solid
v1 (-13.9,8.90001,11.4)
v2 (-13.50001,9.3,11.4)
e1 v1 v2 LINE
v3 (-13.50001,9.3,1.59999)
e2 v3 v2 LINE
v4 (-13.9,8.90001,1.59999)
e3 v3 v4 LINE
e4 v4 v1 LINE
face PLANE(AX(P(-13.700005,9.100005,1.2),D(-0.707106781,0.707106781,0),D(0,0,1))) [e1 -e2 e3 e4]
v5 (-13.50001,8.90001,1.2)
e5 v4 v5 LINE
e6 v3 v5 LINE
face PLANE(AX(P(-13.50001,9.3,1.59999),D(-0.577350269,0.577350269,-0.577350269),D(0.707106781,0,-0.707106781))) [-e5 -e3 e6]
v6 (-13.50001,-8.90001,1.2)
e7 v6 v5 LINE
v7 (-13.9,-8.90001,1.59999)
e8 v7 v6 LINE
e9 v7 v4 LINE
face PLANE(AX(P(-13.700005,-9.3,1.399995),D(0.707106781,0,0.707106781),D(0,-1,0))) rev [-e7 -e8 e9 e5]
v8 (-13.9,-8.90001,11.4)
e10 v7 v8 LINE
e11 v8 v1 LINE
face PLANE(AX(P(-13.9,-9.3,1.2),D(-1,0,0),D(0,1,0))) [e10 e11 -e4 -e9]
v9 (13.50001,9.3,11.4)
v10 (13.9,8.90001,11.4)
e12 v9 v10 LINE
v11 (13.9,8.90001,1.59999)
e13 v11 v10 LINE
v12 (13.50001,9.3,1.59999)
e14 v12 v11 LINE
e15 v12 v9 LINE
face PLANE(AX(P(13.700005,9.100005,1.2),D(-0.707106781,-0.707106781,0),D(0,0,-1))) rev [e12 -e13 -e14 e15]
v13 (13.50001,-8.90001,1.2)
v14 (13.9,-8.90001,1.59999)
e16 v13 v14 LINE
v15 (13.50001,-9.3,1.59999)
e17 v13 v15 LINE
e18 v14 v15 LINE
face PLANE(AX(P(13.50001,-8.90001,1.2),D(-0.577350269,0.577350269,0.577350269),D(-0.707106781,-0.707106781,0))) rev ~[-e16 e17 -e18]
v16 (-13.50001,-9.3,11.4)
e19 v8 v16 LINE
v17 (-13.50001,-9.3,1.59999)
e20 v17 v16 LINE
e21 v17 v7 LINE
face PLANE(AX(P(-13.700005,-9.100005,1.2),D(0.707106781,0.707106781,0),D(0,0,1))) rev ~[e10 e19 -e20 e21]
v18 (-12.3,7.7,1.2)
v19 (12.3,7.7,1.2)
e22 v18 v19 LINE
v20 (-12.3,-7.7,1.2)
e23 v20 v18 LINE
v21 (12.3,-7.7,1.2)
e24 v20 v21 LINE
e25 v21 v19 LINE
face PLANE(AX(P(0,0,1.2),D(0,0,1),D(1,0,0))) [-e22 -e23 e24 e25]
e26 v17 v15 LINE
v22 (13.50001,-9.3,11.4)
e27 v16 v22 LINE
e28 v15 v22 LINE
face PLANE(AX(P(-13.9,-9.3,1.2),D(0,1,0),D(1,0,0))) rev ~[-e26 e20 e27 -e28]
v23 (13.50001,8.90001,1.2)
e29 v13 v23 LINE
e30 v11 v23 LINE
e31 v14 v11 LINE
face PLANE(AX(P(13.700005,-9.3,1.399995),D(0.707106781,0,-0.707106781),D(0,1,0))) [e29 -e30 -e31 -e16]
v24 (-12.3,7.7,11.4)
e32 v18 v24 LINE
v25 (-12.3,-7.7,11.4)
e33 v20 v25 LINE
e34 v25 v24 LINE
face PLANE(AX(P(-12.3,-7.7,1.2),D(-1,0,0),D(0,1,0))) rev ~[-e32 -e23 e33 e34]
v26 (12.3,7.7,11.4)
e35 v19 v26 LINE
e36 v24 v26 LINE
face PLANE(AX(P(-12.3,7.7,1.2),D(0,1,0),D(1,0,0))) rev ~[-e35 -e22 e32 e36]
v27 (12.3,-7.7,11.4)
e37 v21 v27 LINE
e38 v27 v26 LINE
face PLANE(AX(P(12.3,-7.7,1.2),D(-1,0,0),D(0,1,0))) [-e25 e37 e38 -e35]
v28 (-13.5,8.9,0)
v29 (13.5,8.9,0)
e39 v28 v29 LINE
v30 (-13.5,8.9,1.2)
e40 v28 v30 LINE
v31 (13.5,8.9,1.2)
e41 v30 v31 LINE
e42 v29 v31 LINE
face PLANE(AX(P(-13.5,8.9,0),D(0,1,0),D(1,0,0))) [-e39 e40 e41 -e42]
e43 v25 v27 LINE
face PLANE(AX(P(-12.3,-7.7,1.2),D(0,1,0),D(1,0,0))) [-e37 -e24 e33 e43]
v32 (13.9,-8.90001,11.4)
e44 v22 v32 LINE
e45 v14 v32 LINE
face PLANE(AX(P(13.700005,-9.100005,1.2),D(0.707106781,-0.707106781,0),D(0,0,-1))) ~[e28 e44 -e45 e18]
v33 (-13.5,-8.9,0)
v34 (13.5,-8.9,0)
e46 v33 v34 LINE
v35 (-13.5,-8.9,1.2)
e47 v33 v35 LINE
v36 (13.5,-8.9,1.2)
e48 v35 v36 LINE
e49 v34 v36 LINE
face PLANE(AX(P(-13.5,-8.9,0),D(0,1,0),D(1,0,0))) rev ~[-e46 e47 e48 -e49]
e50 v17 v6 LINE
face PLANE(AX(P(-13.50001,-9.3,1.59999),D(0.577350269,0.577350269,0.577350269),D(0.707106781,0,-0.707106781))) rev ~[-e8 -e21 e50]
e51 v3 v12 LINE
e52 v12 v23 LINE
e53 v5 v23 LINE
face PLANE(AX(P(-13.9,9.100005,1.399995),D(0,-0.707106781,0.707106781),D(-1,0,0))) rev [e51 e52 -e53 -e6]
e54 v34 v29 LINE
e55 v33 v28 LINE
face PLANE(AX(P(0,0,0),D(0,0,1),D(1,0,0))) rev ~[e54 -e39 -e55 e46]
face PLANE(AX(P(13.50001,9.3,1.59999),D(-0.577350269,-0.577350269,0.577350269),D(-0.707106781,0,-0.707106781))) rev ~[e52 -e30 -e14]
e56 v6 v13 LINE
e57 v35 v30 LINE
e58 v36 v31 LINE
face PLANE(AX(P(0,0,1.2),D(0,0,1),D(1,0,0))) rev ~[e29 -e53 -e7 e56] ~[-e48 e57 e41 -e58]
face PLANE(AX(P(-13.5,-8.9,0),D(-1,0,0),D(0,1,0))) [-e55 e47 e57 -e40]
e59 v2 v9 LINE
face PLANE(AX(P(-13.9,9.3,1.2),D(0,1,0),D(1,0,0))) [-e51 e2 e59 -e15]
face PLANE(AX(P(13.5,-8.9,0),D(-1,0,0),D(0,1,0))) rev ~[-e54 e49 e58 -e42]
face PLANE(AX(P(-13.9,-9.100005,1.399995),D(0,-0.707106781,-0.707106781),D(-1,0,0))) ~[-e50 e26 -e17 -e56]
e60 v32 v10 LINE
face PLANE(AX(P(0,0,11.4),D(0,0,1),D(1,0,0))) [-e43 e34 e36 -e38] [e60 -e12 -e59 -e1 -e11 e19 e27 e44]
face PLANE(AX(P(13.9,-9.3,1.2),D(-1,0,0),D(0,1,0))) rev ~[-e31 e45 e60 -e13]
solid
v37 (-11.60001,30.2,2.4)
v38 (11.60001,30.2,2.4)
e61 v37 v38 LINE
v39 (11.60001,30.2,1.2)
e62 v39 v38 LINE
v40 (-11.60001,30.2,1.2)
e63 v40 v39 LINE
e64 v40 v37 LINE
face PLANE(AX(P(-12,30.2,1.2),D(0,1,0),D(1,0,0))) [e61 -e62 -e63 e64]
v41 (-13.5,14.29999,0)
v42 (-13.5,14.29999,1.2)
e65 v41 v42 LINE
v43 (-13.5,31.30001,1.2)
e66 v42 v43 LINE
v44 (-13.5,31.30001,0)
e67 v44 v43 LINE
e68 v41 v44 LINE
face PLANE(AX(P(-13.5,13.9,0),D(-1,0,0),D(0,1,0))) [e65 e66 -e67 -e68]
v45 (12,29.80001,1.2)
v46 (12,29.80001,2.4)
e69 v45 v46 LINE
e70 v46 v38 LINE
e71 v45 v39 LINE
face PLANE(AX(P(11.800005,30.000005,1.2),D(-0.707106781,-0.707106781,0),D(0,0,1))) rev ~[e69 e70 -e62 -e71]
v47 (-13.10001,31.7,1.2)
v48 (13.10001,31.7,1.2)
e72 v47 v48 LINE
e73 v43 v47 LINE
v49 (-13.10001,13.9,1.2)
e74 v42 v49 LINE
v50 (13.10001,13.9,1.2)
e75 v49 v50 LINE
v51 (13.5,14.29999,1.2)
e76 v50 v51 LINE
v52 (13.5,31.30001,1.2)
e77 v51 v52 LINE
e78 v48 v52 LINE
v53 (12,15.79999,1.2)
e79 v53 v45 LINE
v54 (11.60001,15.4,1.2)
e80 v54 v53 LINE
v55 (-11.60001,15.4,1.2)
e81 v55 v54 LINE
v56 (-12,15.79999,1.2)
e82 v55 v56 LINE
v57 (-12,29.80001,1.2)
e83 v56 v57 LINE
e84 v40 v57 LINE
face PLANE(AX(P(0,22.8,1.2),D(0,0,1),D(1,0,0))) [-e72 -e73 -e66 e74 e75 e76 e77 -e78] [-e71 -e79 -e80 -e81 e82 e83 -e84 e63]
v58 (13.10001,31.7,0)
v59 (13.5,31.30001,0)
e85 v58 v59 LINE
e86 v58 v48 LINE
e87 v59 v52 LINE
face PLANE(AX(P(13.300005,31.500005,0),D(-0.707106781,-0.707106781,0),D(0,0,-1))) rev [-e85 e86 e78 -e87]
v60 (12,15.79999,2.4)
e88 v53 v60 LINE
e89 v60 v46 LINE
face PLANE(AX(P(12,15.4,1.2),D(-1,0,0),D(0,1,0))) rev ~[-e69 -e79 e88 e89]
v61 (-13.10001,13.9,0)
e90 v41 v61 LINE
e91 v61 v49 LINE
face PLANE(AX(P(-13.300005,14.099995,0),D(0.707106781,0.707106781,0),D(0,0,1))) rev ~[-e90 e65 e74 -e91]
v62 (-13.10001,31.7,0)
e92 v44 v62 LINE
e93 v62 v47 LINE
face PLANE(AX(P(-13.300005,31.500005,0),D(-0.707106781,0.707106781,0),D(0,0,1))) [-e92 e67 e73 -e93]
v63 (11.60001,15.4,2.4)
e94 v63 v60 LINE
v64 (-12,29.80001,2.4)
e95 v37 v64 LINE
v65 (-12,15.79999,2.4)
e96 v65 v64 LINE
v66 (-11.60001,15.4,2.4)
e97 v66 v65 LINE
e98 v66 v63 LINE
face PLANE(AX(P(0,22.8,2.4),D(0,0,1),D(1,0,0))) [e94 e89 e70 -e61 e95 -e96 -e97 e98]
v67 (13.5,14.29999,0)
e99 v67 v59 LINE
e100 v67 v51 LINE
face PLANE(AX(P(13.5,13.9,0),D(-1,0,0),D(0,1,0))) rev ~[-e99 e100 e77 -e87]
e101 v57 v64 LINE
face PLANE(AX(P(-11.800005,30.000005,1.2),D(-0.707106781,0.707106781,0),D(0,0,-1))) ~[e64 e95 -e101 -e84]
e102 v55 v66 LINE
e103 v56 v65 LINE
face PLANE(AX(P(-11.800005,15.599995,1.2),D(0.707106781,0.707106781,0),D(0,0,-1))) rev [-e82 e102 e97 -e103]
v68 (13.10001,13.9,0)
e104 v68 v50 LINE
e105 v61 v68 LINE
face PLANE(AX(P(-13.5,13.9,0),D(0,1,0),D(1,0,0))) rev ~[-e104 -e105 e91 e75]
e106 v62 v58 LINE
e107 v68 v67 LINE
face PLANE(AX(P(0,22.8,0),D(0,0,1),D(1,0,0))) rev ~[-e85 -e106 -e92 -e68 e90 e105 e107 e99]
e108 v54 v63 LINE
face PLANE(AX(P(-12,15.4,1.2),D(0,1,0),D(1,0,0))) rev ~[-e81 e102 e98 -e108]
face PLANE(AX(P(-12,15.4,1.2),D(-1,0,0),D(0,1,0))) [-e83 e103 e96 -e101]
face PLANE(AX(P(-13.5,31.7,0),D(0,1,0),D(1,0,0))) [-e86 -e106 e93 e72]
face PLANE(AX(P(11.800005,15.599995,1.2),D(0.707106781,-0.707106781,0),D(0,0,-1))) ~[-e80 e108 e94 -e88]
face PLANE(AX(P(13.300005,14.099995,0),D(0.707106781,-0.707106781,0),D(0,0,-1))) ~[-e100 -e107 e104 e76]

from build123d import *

# Parameters (mm, degrees)
F0_W      = 27
F0_H      = 17.8
F1_DEPTH  = 1.2
F2_W      = 27.8
F2_H      = 18.6
F2_W_2    = 27
F2_H_2    = 17.8
F2_W_3    = 24.6
F2_H_3    = 15.4
F3_DEPTH  = 10.2
F4_W      = 24
F4_H      = 14.8
F5_DEPTH  = 1.2
F6_SIZE   = 0.39999
F6_2_SIZE = 0.39999


# Not quite as in the source:
# - a fillet or chamfer is up to 0.001 mm smaller than in the source, because OpenCascade refuses the exact size


with BuildPart() as f1:
    # F0 (on Top) → F1 (new body)
    with BuildSketch(Plane.XY):
        Rectangle(F0_W, F0_H)
    extrude(amount=F1_DEPTH)

    # F2 (on face) → F3 (join)
    with BuildSketch(Plane.XY.offset(1.2)):
        Rectangle(F2_W, F2_H)
        Rectangle(F2_W_2, F2_H_2, mode=Mode.SUBTRACT)
        Rectangle(F2_W_2, F2_H_2)
        Rectangle(F2_W_3, F2_H_3, mode=Mode.SUBTRACT)
    extrude(amount=F3_DEPTH)

    # F6 (size 0.4 in the source; OpenCascade refuses exactly that, so slightly less here)
    f6_edges = [f1.edges().sort_by_distance(p)[0] for p in [
        (-13.9, 0, 1.2),
        (-13.9, -9.3, 6.3),
        (-13.9, 9.3, 6.3),
        (13.9, -9.3, 6.3),
        (13.9, 0, 1.2),
        (13.9, 9.3, 6.3),
        (0, 9.3, 1.2),
        (0, -9.3, 1.2),
    ]]
    chamfer(f6_edges, length=F6_SIZE)


with BuildPart() as f1b:
    # F0 (on Top) → F1, piece 2 (new body)
    with BuildSketch(Plane.XY):
        with Locations((0, 22.8)):
            Rectangle(F0_W, F0_H)
    extrude(amount=F1_DEPTH)

    # F4 (on face) → F5 (join)
    with BuildSketch(Plane.XY.offset(1.2)):
        with Locations((0, 22.8)):
            Rectangle(F4_W, F4_H)
    extrude(amount=F5_DEPTH)

    # F6#2 (size 0.4 in the source; OpenCascade refuses exactly that, so slightly less here)
    f6_2_edges = [f1b.edges().sort_by_distance(p)[0] for p in [
        (13.5, 31.7, 0.6),
        (12, 30.2, 1.8),
        (12, 15.4, 1.8),
        (13.5, 13.9, 0.6),
        (-13.5, 31.7, 0.6),
        (-12, 30.2, 1.8),
        (-13.5, 13.9, 0.6),
        (-12, 15.4, 1.8),
    ]]
    chamfer(f6_2_edges, length=F6_2_SIZE)


solid = Compound([f1.part, f1b.part])
